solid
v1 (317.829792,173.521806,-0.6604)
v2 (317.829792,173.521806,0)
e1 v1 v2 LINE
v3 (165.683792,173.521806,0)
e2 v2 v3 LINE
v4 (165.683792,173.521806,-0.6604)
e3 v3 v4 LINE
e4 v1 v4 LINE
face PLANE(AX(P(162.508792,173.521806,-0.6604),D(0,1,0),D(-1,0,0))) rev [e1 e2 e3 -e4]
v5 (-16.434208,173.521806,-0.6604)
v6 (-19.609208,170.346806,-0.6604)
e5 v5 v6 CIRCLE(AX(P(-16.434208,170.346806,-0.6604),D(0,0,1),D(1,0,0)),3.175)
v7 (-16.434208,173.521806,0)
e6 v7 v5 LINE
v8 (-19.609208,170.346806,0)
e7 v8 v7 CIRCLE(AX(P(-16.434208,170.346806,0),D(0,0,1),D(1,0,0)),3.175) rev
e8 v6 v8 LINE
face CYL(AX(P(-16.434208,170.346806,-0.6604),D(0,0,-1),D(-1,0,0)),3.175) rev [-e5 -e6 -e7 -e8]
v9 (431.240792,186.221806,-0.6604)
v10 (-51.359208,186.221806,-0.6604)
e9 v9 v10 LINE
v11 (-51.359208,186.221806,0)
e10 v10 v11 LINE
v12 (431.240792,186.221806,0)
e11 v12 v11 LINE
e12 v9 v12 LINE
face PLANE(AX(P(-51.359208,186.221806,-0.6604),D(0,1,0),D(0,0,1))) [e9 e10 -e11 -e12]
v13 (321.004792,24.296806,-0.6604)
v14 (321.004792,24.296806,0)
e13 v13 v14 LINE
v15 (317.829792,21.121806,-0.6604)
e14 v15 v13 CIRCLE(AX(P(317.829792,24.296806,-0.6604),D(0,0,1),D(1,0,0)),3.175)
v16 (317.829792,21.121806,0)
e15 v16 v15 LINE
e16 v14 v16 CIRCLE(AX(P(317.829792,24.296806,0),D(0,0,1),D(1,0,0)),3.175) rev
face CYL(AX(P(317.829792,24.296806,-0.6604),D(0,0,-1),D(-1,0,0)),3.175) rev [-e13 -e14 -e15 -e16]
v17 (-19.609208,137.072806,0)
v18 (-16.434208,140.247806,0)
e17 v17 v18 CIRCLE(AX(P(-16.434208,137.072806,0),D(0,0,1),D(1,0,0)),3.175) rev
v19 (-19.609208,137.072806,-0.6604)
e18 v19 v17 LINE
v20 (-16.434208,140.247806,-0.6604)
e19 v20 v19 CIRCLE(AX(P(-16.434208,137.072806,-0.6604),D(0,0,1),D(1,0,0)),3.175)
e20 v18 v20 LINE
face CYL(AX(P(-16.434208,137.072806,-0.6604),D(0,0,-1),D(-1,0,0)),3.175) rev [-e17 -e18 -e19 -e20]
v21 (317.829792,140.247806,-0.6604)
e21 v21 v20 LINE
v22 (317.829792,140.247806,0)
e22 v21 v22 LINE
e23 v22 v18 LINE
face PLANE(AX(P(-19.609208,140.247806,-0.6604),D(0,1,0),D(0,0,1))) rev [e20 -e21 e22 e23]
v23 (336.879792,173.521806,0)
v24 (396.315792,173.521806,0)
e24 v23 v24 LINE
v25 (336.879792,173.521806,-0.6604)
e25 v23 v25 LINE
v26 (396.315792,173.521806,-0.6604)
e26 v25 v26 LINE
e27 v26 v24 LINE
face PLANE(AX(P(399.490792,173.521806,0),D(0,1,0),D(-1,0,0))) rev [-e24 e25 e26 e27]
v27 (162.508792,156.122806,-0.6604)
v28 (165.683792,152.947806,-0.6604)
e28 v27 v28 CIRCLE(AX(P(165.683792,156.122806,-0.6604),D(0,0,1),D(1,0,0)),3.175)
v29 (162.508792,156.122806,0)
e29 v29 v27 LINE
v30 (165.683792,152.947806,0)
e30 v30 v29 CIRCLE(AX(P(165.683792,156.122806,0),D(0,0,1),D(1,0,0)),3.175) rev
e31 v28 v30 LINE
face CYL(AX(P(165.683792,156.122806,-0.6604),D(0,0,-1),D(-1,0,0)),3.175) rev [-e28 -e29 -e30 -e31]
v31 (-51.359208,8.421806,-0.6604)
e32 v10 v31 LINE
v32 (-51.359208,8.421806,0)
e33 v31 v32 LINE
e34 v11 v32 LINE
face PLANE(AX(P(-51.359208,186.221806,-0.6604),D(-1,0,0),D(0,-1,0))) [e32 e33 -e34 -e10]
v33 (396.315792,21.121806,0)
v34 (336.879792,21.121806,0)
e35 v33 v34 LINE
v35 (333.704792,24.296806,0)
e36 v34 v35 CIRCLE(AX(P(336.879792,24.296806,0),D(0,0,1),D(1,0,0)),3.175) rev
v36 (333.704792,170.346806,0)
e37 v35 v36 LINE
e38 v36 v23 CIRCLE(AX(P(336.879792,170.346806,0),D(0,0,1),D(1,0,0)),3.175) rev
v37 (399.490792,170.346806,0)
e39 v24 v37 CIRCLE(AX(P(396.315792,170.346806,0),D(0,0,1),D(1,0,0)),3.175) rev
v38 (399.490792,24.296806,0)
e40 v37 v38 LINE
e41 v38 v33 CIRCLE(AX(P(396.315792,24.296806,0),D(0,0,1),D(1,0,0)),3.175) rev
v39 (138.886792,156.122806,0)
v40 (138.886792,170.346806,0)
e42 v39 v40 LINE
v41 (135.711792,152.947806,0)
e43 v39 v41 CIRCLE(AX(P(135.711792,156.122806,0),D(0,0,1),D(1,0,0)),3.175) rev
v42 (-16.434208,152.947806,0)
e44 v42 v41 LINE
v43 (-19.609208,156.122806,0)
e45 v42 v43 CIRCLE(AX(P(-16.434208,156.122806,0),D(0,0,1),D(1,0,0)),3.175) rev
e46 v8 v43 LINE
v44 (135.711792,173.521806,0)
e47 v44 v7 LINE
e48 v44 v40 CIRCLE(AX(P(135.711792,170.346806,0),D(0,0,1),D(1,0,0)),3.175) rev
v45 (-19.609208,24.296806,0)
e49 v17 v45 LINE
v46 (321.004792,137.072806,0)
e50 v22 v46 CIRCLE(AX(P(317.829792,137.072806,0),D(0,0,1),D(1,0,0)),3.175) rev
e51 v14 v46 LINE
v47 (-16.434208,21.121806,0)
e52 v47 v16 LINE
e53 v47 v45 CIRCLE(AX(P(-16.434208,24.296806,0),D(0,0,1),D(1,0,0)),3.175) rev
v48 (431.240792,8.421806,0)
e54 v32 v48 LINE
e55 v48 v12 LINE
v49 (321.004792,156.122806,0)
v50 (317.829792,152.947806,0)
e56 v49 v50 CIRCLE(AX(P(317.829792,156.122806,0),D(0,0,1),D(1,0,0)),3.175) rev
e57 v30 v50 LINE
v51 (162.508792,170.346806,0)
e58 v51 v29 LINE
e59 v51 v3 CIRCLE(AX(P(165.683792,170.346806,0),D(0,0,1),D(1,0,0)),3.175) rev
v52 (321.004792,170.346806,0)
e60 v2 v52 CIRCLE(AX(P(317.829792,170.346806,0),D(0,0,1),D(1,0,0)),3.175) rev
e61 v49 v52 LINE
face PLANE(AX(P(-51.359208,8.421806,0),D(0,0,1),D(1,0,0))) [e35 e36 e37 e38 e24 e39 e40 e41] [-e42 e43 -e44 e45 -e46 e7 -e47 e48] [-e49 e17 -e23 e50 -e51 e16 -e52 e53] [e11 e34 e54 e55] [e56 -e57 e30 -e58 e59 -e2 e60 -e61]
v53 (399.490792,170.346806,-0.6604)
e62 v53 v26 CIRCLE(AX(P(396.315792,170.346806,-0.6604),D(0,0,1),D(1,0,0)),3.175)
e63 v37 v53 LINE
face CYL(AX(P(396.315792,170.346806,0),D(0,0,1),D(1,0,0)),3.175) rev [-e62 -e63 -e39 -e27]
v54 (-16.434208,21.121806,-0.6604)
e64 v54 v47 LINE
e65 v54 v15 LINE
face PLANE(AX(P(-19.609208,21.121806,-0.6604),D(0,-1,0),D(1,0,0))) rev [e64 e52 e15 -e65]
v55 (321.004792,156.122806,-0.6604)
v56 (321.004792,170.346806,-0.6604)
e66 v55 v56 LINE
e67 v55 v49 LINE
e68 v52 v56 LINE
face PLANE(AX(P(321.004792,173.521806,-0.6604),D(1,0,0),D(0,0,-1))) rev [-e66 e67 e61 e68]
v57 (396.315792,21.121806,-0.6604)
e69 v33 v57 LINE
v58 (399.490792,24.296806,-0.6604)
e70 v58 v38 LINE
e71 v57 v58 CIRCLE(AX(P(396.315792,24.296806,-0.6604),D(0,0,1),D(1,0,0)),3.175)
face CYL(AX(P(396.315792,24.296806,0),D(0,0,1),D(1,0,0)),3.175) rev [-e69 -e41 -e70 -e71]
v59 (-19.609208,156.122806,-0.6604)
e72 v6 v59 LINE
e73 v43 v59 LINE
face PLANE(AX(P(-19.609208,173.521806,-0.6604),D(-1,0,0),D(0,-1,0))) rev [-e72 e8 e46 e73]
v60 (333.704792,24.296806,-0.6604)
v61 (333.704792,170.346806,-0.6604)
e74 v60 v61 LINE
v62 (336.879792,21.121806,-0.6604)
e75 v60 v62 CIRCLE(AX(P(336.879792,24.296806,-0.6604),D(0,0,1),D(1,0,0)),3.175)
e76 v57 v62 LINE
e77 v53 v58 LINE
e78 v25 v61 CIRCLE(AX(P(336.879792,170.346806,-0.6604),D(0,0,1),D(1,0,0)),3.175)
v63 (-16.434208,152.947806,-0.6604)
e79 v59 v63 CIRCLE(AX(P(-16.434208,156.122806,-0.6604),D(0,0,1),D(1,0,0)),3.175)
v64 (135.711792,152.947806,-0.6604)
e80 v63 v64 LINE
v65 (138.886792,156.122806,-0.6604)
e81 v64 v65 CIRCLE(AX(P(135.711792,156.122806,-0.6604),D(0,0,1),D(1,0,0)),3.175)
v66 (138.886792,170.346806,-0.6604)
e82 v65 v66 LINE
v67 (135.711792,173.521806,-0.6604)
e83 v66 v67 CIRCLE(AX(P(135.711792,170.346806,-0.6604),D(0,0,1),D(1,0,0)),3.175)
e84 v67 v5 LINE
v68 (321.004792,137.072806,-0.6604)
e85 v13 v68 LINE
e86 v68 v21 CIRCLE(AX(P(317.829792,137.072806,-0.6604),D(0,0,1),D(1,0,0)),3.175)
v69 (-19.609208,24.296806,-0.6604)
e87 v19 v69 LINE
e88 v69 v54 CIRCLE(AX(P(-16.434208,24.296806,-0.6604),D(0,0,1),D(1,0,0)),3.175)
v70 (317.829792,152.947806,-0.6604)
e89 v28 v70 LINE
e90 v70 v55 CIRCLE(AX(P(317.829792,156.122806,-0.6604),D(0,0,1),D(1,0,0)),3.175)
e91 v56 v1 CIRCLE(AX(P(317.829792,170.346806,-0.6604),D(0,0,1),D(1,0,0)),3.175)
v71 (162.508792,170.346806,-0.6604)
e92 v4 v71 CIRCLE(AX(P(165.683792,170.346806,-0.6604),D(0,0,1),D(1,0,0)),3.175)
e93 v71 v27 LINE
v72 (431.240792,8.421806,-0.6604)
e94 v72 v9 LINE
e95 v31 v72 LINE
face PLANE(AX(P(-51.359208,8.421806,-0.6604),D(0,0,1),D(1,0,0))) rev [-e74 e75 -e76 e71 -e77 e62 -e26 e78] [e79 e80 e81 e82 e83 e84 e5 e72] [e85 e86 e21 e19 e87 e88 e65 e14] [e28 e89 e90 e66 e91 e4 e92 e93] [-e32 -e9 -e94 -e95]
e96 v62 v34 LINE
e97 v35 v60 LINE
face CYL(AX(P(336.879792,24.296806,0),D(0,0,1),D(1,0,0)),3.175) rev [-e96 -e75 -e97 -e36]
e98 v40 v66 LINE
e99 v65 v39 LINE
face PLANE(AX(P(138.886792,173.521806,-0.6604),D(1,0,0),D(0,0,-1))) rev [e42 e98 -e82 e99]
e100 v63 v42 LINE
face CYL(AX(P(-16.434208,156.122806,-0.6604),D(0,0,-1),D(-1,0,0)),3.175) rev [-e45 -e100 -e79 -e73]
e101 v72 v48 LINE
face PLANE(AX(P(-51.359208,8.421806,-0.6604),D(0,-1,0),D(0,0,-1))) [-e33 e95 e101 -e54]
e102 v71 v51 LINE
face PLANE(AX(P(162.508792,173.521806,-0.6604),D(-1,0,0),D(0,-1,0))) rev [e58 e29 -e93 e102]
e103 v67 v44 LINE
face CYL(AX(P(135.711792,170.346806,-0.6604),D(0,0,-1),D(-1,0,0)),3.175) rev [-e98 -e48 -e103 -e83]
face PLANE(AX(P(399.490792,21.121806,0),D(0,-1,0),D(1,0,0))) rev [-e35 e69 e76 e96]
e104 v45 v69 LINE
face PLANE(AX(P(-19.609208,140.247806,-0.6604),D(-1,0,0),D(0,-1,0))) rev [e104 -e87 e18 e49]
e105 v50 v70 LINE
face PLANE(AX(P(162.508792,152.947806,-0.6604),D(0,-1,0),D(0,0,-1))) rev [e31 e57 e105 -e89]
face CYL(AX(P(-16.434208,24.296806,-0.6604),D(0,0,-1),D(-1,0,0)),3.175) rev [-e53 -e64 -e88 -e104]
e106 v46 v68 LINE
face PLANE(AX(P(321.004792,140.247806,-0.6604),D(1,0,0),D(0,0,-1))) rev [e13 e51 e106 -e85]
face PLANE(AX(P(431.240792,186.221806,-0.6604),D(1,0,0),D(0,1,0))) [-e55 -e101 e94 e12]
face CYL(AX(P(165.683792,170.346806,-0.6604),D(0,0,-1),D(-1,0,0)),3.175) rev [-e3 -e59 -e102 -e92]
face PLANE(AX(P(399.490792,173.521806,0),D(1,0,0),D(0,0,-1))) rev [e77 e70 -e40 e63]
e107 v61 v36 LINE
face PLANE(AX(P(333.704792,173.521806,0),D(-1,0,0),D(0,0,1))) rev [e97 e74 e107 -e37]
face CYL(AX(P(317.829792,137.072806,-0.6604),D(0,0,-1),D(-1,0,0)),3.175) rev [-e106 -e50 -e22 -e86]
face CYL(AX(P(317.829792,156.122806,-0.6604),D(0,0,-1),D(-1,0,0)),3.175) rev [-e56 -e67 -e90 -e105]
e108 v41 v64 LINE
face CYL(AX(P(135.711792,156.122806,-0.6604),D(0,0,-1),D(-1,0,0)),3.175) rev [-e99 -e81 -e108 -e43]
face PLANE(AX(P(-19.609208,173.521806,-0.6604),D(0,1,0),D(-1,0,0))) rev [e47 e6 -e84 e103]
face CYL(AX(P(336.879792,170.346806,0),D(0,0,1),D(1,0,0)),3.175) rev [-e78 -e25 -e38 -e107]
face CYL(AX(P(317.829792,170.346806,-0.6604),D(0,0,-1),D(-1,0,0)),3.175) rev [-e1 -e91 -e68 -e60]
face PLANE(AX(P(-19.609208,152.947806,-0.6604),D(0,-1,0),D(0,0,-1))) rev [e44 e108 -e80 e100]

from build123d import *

# Parameters (mm, degrees)
SKETCH1_W          = 482.6
SKETCH1_H          = 177.8
BASE_FLANGE1_DEPTH = 0.6604
SKETCH2_W          = 158.496
SKETCH2_H          = 20.574
CUT_EXTRUDE1_DEPTH = 0.6604
LPATTERN1_COUNT    = 2
LPATTERN1_PITCH    = 182.118
SKETCH3_W          = 340.614
SKETCH3_H          = 119.126
CUT_EXTRUDE2_DEPTH = 0.6604
SKETCH4_W          = 65.786
SKETCH4_H          = 152.4
CUT_EXTRUDE3_DEPTH = 0.6604
FILLET1_R          = 3.175


# Sheet-metal steps are written as plain solids
with BuildPart() as part:
    # Sketch1 → Base-Flange1 (new body)
    with BuildSketch(Plane.XY):
        with Locations((189.940791832, 97.32180564)):
            Rectangle(SKETCH1_W, SKETCH1_H)
    extrude(amount=-BASE_FLANGE1_DEPTH)

    # Sketch2 → Cut-Extrude1 (cut)
    with BuildSketch(Plane.XY):
        with Locations((59.638791832, 163.23480564)):
            Rectangle(SKETCH2_W, SKETCH2_H)
    cut_extrude1 = extrude(amount=-CUT_EXTRUDE1_DEPTH, mode=Mode.SUBTRACT)

    # LPattern1: Cut-Extrude1 ×2
    with Locations(*[(i * LPATTERN1_PITCH, 0, 0) for i in range(1, LPATTERN1_COUNT)]):
        add(cut_extrude1, mode=Mode.SUBTRACT)

    # Sketch3 → Cut-Extrude2 (cut)
    with BuildSketch(Plane.XY):
        with Locations((150.697791832, 80.68480564)):
            Rectangle(SKETCH3_W, SKETCH3_H)
    extrude(amount=-CUT_EXTRUDE2_DEPTH, mode=Mode.SUBTRACT)

    # Sketch4 → Cut-Extrude3 (cut)
    with BuildSketch(Plane(origin=(0, 0, -0.6604), x_dir=(-1, 0, 0), z_dir=(0, 0, -1))):
        with Locations((-366.597791832, 97.32180564)):
            Rectangle(SKETCH4_W, SKETCH4_H)
    extrude(amount=-CUT_EXTRUDE3_DEPTH, mode=Mode.SUBTRACT)

    # Fillet1
    fillet1_edges = [part.edges().sort_by_distance(p)[0] for p in [
        (-19.609208168, 152.94780564, -0.3302),
        (-19.609208168, 173.52180564, -0.3302),
        (138.886791832, 173.52180564, -0.3302),
        (138.886791832, 152.94780564, -0.3302),
        (162.508791832, 152.94780564, -0.3302),
        (162.508791832, 173.52180564, -0.3302),
        (321.004791832, 173.52180564, -0.3302),
        (321.004791832, 152.94780564, -0.3302),
        (-19.609208168, 21.12180564, -0.3302),
        (-19.609208168, 140.24780564, -0.3302),
        (321.004791832, 140.24780564, -0.3302),
        (321.004791832, 21.12180564, -0.3302),
        (399.490791832, 21.12180564, -0.3302),
        (399.490791832, 173.52180564, -0.3302),
        (333.704791832, 173.52180564, -0.3302),
        (333.704791832, 21.12180564, -0.3302),
    ]]
    fillet(fillet1_edges, radius=FILLET1_R)


solid = part.part
